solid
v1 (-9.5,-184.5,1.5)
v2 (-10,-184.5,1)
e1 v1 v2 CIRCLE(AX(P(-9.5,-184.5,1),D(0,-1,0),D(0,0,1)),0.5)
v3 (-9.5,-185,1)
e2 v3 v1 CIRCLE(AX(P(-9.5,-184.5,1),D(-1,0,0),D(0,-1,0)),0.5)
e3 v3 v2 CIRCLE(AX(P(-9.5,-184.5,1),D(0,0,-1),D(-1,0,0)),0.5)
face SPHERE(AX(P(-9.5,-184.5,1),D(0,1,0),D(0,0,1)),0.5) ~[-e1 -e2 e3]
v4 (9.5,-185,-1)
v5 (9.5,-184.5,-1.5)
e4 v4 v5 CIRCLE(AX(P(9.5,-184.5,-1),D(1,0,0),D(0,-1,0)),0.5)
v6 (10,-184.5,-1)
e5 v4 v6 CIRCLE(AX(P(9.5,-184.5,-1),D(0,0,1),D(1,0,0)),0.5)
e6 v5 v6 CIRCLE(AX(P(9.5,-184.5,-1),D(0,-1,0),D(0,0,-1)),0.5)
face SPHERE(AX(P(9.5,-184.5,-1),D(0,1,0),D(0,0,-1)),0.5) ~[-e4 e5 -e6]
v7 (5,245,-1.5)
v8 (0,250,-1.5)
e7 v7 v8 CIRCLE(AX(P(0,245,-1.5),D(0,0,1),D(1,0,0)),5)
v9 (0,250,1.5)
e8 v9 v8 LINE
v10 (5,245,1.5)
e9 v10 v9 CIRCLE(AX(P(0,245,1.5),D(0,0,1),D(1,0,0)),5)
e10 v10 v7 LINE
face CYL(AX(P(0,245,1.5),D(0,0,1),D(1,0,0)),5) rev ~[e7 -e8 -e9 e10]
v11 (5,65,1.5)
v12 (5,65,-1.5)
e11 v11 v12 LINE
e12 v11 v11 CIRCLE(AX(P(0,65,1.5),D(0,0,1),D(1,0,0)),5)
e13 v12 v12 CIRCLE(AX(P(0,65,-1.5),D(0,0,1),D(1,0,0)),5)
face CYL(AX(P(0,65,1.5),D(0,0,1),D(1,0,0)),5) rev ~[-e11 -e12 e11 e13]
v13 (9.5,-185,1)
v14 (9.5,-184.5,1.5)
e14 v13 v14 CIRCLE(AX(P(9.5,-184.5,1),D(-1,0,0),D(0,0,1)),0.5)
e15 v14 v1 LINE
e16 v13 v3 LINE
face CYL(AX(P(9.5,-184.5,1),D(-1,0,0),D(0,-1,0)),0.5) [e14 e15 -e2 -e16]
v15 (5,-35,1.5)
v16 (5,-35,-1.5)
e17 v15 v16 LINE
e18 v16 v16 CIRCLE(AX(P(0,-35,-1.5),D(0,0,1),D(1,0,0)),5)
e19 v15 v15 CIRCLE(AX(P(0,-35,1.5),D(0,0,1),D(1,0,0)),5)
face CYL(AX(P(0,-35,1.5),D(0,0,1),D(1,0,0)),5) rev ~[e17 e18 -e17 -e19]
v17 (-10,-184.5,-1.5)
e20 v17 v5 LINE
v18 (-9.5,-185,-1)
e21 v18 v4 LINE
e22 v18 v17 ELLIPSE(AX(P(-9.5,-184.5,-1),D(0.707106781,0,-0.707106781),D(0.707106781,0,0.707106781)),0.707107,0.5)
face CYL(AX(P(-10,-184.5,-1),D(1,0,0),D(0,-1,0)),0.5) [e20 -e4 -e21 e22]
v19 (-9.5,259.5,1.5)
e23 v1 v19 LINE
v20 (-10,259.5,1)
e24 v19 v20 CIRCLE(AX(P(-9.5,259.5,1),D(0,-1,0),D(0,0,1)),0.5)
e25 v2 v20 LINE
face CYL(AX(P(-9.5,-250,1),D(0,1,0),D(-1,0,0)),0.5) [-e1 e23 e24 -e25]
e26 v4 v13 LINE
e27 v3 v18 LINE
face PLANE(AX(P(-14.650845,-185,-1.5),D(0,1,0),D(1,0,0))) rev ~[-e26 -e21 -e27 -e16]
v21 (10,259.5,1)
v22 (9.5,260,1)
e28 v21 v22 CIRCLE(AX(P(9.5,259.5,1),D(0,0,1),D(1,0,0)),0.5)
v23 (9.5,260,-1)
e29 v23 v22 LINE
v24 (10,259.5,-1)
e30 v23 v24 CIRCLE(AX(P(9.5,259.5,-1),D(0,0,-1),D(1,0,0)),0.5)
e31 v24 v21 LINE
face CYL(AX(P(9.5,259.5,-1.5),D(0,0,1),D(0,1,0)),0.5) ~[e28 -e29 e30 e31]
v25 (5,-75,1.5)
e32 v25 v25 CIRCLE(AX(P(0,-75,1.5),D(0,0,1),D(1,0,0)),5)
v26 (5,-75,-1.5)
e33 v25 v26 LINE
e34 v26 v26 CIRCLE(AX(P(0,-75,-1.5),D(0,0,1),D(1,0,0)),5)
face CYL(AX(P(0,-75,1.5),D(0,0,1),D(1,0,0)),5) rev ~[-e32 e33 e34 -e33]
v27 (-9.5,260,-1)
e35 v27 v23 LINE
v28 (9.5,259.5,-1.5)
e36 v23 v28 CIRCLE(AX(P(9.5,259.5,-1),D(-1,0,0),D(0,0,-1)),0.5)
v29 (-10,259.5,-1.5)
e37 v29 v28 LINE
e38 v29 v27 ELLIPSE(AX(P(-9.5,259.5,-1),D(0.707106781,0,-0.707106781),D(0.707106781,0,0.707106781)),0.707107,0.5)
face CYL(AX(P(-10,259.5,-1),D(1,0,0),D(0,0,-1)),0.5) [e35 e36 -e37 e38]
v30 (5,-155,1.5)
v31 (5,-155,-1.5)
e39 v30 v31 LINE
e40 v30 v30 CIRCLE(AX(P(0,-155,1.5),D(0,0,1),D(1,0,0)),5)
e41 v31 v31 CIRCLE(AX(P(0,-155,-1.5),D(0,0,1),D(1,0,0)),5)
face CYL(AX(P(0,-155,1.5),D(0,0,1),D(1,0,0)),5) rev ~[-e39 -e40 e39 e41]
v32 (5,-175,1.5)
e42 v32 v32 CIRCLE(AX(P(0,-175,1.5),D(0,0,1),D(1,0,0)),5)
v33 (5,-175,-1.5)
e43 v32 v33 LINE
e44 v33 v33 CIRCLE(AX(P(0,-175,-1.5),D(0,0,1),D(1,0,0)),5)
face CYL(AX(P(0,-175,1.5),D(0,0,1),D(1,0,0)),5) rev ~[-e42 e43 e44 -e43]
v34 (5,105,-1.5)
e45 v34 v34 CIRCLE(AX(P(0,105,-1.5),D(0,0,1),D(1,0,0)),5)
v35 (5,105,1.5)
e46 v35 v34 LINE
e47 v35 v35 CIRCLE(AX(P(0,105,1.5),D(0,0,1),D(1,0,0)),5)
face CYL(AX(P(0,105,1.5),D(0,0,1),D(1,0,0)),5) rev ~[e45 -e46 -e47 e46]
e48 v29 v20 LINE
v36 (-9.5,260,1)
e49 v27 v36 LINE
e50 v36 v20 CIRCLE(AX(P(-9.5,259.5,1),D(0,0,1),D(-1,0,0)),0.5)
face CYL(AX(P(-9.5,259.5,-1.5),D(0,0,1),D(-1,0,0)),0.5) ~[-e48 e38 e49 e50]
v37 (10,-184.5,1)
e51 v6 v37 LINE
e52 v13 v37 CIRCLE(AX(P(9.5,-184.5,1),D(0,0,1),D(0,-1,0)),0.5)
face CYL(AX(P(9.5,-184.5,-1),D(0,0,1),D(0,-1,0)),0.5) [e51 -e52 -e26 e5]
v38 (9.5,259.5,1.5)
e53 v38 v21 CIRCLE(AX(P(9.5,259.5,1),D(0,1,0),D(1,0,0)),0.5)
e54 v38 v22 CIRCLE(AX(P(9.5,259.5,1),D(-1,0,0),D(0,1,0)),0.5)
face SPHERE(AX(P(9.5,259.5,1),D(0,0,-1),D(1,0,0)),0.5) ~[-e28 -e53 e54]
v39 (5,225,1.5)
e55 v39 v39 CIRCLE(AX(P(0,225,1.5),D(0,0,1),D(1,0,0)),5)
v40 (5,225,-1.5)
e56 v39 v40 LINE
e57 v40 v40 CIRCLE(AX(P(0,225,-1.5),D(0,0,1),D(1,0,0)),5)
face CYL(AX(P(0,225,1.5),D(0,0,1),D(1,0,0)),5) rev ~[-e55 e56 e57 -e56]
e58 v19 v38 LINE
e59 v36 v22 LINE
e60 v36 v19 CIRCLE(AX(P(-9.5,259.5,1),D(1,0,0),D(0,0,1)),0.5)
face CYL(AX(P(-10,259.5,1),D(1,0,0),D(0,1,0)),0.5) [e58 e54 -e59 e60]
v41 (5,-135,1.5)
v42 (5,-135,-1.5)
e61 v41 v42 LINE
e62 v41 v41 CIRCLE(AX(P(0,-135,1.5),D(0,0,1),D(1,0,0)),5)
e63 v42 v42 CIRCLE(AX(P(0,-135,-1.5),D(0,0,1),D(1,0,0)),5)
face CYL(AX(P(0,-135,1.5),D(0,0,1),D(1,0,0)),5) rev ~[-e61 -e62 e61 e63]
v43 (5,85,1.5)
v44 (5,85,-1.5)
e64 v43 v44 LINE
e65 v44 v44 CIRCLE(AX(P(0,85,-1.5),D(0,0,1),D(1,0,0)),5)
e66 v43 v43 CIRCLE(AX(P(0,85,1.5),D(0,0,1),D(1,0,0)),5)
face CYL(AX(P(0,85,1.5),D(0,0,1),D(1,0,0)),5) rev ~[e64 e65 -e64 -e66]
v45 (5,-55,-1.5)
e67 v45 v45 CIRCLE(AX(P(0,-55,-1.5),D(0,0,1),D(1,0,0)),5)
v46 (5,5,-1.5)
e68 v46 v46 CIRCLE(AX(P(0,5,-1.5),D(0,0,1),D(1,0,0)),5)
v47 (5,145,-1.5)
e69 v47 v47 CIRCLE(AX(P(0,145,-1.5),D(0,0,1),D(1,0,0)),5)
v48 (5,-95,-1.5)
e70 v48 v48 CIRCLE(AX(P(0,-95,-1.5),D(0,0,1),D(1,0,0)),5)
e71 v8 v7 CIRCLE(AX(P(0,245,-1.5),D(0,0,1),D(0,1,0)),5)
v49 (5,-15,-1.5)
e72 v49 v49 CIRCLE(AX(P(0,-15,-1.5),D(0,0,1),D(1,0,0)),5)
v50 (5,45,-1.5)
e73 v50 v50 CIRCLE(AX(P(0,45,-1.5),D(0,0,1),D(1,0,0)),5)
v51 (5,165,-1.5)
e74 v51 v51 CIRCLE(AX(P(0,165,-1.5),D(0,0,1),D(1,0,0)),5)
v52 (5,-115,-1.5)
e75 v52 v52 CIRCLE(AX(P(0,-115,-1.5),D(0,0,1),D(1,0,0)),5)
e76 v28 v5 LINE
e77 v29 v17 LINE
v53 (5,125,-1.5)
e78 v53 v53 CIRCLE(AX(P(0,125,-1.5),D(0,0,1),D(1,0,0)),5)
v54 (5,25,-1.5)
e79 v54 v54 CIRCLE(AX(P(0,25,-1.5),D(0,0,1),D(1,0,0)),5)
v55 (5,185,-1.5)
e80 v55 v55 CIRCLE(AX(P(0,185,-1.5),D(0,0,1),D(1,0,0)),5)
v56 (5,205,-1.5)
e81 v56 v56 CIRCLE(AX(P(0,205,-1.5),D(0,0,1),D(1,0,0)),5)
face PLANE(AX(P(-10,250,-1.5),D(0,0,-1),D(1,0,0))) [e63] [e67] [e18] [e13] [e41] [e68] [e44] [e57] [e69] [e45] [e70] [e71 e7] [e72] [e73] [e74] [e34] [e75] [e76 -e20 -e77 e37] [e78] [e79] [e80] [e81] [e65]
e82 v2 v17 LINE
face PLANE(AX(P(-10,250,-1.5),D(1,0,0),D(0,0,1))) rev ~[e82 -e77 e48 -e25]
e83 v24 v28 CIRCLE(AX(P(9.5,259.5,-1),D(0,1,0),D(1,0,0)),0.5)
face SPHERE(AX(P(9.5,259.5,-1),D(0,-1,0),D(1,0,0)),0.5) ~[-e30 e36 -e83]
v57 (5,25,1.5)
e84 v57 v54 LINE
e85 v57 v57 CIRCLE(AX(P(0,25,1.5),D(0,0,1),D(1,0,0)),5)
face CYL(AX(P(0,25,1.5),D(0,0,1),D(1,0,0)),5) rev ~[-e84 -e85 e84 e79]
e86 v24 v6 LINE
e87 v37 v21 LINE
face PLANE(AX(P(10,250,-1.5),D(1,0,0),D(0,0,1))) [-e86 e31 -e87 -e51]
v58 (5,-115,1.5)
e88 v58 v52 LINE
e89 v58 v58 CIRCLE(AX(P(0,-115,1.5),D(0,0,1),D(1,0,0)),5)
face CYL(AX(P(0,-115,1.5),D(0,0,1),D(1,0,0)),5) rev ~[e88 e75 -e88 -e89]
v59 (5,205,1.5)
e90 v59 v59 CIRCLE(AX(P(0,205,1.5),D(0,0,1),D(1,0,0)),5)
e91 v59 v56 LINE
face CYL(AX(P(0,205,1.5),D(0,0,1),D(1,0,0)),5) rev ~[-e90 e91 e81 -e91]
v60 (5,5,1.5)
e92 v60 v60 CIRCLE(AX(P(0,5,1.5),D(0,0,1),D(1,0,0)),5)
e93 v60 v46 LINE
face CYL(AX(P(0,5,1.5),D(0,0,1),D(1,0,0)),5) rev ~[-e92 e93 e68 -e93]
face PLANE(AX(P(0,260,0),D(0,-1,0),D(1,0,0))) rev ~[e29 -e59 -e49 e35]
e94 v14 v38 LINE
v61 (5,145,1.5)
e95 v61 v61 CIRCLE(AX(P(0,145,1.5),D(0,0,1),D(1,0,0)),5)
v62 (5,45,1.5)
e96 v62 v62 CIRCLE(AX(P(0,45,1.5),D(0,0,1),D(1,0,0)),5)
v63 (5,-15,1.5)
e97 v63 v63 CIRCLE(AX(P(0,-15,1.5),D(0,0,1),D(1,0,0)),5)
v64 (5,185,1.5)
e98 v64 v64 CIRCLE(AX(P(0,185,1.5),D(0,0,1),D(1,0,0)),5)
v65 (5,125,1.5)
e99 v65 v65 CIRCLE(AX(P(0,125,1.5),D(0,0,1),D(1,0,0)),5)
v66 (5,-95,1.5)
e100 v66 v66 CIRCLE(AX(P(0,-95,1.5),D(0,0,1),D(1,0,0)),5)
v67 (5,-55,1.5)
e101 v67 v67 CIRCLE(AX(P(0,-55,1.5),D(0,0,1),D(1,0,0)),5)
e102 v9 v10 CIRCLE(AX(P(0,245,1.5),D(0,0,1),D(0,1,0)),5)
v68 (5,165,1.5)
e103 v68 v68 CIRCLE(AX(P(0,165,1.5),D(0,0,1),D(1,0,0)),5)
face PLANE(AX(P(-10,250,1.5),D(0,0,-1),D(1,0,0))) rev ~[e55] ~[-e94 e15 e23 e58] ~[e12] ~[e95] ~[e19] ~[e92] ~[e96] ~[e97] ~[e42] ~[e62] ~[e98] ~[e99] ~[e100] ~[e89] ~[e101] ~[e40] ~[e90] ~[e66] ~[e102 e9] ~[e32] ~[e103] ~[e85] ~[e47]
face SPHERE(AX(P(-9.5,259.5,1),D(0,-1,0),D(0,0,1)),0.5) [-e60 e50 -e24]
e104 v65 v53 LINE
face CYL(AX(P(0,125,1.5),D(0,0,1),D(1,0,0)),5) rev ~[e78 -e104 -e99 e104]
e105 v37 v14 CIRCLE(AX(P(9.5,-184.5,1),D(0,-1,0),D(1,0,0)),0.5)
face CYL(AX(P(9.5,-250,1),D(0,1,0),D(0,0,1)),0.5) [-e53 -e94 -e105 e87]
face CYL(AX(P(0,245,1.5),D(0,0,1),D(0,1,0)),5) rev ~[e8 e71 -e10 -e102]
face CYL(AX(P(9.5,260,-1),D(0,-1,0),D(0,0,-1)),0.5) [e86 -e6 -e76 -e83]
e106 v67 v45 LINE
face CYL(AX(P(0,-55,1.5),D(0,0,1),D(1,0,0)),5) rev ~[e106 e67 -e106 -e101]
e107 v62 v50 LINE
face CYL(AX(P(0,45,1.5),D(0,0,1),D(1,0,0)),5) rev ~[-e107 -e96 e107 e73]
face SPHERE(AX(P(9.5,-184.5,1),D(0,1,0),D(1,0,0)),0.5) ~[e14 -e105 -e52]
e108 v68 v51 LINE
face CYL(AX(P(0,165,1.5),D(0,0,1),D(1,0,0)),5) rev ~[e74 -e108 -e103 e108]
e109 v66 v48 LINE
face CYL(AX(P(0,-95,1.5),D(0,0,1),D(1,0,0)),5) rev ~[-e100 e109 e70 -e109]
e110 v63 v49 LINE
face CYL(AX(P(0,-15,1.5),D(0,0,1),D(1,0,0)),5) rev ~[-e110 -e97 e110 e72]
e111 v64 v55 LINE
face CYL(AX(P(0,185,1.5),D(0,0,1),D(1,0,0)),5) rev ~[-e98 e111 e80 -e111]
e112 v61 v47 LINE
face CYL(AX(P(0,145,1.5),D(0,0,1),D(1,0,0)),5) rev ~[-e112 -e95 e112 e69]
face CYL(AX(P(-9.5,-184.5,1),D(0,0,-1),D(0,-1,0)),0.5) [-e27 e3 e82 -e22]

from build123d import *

# Parameters (mm, degrees)
F0_W     = 20
F0_H     = 3
F1_DEPTH = 250
F3_DEPTH = 10
F2_R     = 5
F4_DEPTH = 3
F5_R     = 0.5
F7_DEPTH = 25
F8_R     = 0.5


with BuildPart() as f1:
    # F0 (on Front) → F1 (new body, symmetric)
    with BuildSketch(Plane.XZ):
        Rectangle(F0_W, F0_H)
    extrude(amount=F1_DEPTH, both=True)

    # F3 (add): a face of the model
    f3_faces = [f1.faces().sort_by_distance(p)[0] for p in [
        (0, 250, 0),
    ]]
    extrude(f3_faces, amount=F3_DEPTH)

    # F2 (on face) → F4 (cut)
    with BuildSketch(Plane.XY.offset(1.5)):
        with BuildLine():
            ThreePointArc((5, -215), (-3.5355339059, -211.4644660941), (0, -220))
            ThreePointArc((0, -220), (3.5355339059, -218.5355339059), (5, -215))
        make_face()
        with BuildLine():
            ThreePointArc((0, -230), (-5, -235), (0, -240))
            ThreePointArc((0, -240), (3.5355339059, -238.5355339059), (5, -235))
            ThreePointArc((5, -235), (3.5355339059, -231.4644660941), (0, -230))
        make_face()
        with BuildLine():
            ThreePointArc((5, 245), (3.5355339059, 248.5355339059), (0, 250))
            ThreePointArc((0, 250), (-3.5355339059, 241.4644660941), (5, 245))
        make_face()
        with Locations((0, -195)):
            Circle(F2_R)
        with Locations((0, -175)):
            Circle(F2_R)
        with Locations((0, -155)):
            Circle(F2_R)
        with Locations((0, -135)):
            Circle(F2_R)
        with Locations((0, -115)):
            Circle(F2_R)
        with Locations((0, -95)):
            Circle(F2_R)
        with Locations((0, -75)):
            Circle(F2_R)
        with Locations((0, -55)):
            Circle(F2_R)
        with Locations((0, -35)):
            Circle(F2_R)
        with Locations((0, -15)):
            Circle(F2_R)
        with Locations((0, 5)):
            Circle(F2_R)
        with Locations((0, 25)):
            Circle(F2_R)
        with Locations((0, 45)):
            Circle(F2_R)
        with Locations((0, 65)):
            Circle(F2_R)
        with Locations((0, 85)):
            Circle(F2_R)
        with Locations((0, 105)):
            Circle(F2_R)
        with Locations((0, 125)):
            Circle(F2_R)
        with Locations((0, 145)):
            Circle(F2_R)
        with Locations((0, 165)):
            Circle(F2_R)
        with Locations((0, 185)):
            Circle(F2_R)
        with Locations((0, 205)):
            Circle(F2_R)
        with Locations((0, 225)):
            Circle(F2_R)
    extrude(amount=-F4_DEPTH, mode=Mode.SUBTRACT)

    # F5
    f5_edges = [f1.edges().sort_by_distance(p)[0] for p in [
        (10, -250, 0),
        (10, 5, -1.5),
        (10, 260, 0),
        (10, 5, 1.5),
        (0, -250, 1.5),
        (-10, -250, 0),
        (0, -250, -1.5),
        (-10, 5, 1.5),
        (0, 260, 1.5),
        (-10, 260, 0),
        (0, 260, -1.5),
    ]]
    fillet(f5_edges, radius=F5_R)

    # F6 (on face) → F7 (cut)
    with BuildSketch(Plane(origin=(0, 0, -1.5), x_dir=(1, 0, 0), z_dir=(0, 0, -1))):
        Polygon((0, 185), (16.080936417, 185), (32.4585177004, 259.3803107738), (-14.6508449689, 254.37900424), (-14.6508449689, 185), align=None)
    extrude(amount=-F7_DEPTH, mode=Mode.SUBTRACT)

    # F8
    f8_edges = [f1.edges().sort_by_distance(p)[0] for p in [
        (9.853553, -185, -1.353553),
        (10, -185, 0),
        (9.853553, -185, 1.353553),
        (0, -185, 1.5),
        (-9.853553, -185, 1.353553),
        (-10, -185, -0.25),
        (-0.25, -185, -1.5),
    ]]
    fillet(f8_edges, radius=F8_R)


solid = f1.part
